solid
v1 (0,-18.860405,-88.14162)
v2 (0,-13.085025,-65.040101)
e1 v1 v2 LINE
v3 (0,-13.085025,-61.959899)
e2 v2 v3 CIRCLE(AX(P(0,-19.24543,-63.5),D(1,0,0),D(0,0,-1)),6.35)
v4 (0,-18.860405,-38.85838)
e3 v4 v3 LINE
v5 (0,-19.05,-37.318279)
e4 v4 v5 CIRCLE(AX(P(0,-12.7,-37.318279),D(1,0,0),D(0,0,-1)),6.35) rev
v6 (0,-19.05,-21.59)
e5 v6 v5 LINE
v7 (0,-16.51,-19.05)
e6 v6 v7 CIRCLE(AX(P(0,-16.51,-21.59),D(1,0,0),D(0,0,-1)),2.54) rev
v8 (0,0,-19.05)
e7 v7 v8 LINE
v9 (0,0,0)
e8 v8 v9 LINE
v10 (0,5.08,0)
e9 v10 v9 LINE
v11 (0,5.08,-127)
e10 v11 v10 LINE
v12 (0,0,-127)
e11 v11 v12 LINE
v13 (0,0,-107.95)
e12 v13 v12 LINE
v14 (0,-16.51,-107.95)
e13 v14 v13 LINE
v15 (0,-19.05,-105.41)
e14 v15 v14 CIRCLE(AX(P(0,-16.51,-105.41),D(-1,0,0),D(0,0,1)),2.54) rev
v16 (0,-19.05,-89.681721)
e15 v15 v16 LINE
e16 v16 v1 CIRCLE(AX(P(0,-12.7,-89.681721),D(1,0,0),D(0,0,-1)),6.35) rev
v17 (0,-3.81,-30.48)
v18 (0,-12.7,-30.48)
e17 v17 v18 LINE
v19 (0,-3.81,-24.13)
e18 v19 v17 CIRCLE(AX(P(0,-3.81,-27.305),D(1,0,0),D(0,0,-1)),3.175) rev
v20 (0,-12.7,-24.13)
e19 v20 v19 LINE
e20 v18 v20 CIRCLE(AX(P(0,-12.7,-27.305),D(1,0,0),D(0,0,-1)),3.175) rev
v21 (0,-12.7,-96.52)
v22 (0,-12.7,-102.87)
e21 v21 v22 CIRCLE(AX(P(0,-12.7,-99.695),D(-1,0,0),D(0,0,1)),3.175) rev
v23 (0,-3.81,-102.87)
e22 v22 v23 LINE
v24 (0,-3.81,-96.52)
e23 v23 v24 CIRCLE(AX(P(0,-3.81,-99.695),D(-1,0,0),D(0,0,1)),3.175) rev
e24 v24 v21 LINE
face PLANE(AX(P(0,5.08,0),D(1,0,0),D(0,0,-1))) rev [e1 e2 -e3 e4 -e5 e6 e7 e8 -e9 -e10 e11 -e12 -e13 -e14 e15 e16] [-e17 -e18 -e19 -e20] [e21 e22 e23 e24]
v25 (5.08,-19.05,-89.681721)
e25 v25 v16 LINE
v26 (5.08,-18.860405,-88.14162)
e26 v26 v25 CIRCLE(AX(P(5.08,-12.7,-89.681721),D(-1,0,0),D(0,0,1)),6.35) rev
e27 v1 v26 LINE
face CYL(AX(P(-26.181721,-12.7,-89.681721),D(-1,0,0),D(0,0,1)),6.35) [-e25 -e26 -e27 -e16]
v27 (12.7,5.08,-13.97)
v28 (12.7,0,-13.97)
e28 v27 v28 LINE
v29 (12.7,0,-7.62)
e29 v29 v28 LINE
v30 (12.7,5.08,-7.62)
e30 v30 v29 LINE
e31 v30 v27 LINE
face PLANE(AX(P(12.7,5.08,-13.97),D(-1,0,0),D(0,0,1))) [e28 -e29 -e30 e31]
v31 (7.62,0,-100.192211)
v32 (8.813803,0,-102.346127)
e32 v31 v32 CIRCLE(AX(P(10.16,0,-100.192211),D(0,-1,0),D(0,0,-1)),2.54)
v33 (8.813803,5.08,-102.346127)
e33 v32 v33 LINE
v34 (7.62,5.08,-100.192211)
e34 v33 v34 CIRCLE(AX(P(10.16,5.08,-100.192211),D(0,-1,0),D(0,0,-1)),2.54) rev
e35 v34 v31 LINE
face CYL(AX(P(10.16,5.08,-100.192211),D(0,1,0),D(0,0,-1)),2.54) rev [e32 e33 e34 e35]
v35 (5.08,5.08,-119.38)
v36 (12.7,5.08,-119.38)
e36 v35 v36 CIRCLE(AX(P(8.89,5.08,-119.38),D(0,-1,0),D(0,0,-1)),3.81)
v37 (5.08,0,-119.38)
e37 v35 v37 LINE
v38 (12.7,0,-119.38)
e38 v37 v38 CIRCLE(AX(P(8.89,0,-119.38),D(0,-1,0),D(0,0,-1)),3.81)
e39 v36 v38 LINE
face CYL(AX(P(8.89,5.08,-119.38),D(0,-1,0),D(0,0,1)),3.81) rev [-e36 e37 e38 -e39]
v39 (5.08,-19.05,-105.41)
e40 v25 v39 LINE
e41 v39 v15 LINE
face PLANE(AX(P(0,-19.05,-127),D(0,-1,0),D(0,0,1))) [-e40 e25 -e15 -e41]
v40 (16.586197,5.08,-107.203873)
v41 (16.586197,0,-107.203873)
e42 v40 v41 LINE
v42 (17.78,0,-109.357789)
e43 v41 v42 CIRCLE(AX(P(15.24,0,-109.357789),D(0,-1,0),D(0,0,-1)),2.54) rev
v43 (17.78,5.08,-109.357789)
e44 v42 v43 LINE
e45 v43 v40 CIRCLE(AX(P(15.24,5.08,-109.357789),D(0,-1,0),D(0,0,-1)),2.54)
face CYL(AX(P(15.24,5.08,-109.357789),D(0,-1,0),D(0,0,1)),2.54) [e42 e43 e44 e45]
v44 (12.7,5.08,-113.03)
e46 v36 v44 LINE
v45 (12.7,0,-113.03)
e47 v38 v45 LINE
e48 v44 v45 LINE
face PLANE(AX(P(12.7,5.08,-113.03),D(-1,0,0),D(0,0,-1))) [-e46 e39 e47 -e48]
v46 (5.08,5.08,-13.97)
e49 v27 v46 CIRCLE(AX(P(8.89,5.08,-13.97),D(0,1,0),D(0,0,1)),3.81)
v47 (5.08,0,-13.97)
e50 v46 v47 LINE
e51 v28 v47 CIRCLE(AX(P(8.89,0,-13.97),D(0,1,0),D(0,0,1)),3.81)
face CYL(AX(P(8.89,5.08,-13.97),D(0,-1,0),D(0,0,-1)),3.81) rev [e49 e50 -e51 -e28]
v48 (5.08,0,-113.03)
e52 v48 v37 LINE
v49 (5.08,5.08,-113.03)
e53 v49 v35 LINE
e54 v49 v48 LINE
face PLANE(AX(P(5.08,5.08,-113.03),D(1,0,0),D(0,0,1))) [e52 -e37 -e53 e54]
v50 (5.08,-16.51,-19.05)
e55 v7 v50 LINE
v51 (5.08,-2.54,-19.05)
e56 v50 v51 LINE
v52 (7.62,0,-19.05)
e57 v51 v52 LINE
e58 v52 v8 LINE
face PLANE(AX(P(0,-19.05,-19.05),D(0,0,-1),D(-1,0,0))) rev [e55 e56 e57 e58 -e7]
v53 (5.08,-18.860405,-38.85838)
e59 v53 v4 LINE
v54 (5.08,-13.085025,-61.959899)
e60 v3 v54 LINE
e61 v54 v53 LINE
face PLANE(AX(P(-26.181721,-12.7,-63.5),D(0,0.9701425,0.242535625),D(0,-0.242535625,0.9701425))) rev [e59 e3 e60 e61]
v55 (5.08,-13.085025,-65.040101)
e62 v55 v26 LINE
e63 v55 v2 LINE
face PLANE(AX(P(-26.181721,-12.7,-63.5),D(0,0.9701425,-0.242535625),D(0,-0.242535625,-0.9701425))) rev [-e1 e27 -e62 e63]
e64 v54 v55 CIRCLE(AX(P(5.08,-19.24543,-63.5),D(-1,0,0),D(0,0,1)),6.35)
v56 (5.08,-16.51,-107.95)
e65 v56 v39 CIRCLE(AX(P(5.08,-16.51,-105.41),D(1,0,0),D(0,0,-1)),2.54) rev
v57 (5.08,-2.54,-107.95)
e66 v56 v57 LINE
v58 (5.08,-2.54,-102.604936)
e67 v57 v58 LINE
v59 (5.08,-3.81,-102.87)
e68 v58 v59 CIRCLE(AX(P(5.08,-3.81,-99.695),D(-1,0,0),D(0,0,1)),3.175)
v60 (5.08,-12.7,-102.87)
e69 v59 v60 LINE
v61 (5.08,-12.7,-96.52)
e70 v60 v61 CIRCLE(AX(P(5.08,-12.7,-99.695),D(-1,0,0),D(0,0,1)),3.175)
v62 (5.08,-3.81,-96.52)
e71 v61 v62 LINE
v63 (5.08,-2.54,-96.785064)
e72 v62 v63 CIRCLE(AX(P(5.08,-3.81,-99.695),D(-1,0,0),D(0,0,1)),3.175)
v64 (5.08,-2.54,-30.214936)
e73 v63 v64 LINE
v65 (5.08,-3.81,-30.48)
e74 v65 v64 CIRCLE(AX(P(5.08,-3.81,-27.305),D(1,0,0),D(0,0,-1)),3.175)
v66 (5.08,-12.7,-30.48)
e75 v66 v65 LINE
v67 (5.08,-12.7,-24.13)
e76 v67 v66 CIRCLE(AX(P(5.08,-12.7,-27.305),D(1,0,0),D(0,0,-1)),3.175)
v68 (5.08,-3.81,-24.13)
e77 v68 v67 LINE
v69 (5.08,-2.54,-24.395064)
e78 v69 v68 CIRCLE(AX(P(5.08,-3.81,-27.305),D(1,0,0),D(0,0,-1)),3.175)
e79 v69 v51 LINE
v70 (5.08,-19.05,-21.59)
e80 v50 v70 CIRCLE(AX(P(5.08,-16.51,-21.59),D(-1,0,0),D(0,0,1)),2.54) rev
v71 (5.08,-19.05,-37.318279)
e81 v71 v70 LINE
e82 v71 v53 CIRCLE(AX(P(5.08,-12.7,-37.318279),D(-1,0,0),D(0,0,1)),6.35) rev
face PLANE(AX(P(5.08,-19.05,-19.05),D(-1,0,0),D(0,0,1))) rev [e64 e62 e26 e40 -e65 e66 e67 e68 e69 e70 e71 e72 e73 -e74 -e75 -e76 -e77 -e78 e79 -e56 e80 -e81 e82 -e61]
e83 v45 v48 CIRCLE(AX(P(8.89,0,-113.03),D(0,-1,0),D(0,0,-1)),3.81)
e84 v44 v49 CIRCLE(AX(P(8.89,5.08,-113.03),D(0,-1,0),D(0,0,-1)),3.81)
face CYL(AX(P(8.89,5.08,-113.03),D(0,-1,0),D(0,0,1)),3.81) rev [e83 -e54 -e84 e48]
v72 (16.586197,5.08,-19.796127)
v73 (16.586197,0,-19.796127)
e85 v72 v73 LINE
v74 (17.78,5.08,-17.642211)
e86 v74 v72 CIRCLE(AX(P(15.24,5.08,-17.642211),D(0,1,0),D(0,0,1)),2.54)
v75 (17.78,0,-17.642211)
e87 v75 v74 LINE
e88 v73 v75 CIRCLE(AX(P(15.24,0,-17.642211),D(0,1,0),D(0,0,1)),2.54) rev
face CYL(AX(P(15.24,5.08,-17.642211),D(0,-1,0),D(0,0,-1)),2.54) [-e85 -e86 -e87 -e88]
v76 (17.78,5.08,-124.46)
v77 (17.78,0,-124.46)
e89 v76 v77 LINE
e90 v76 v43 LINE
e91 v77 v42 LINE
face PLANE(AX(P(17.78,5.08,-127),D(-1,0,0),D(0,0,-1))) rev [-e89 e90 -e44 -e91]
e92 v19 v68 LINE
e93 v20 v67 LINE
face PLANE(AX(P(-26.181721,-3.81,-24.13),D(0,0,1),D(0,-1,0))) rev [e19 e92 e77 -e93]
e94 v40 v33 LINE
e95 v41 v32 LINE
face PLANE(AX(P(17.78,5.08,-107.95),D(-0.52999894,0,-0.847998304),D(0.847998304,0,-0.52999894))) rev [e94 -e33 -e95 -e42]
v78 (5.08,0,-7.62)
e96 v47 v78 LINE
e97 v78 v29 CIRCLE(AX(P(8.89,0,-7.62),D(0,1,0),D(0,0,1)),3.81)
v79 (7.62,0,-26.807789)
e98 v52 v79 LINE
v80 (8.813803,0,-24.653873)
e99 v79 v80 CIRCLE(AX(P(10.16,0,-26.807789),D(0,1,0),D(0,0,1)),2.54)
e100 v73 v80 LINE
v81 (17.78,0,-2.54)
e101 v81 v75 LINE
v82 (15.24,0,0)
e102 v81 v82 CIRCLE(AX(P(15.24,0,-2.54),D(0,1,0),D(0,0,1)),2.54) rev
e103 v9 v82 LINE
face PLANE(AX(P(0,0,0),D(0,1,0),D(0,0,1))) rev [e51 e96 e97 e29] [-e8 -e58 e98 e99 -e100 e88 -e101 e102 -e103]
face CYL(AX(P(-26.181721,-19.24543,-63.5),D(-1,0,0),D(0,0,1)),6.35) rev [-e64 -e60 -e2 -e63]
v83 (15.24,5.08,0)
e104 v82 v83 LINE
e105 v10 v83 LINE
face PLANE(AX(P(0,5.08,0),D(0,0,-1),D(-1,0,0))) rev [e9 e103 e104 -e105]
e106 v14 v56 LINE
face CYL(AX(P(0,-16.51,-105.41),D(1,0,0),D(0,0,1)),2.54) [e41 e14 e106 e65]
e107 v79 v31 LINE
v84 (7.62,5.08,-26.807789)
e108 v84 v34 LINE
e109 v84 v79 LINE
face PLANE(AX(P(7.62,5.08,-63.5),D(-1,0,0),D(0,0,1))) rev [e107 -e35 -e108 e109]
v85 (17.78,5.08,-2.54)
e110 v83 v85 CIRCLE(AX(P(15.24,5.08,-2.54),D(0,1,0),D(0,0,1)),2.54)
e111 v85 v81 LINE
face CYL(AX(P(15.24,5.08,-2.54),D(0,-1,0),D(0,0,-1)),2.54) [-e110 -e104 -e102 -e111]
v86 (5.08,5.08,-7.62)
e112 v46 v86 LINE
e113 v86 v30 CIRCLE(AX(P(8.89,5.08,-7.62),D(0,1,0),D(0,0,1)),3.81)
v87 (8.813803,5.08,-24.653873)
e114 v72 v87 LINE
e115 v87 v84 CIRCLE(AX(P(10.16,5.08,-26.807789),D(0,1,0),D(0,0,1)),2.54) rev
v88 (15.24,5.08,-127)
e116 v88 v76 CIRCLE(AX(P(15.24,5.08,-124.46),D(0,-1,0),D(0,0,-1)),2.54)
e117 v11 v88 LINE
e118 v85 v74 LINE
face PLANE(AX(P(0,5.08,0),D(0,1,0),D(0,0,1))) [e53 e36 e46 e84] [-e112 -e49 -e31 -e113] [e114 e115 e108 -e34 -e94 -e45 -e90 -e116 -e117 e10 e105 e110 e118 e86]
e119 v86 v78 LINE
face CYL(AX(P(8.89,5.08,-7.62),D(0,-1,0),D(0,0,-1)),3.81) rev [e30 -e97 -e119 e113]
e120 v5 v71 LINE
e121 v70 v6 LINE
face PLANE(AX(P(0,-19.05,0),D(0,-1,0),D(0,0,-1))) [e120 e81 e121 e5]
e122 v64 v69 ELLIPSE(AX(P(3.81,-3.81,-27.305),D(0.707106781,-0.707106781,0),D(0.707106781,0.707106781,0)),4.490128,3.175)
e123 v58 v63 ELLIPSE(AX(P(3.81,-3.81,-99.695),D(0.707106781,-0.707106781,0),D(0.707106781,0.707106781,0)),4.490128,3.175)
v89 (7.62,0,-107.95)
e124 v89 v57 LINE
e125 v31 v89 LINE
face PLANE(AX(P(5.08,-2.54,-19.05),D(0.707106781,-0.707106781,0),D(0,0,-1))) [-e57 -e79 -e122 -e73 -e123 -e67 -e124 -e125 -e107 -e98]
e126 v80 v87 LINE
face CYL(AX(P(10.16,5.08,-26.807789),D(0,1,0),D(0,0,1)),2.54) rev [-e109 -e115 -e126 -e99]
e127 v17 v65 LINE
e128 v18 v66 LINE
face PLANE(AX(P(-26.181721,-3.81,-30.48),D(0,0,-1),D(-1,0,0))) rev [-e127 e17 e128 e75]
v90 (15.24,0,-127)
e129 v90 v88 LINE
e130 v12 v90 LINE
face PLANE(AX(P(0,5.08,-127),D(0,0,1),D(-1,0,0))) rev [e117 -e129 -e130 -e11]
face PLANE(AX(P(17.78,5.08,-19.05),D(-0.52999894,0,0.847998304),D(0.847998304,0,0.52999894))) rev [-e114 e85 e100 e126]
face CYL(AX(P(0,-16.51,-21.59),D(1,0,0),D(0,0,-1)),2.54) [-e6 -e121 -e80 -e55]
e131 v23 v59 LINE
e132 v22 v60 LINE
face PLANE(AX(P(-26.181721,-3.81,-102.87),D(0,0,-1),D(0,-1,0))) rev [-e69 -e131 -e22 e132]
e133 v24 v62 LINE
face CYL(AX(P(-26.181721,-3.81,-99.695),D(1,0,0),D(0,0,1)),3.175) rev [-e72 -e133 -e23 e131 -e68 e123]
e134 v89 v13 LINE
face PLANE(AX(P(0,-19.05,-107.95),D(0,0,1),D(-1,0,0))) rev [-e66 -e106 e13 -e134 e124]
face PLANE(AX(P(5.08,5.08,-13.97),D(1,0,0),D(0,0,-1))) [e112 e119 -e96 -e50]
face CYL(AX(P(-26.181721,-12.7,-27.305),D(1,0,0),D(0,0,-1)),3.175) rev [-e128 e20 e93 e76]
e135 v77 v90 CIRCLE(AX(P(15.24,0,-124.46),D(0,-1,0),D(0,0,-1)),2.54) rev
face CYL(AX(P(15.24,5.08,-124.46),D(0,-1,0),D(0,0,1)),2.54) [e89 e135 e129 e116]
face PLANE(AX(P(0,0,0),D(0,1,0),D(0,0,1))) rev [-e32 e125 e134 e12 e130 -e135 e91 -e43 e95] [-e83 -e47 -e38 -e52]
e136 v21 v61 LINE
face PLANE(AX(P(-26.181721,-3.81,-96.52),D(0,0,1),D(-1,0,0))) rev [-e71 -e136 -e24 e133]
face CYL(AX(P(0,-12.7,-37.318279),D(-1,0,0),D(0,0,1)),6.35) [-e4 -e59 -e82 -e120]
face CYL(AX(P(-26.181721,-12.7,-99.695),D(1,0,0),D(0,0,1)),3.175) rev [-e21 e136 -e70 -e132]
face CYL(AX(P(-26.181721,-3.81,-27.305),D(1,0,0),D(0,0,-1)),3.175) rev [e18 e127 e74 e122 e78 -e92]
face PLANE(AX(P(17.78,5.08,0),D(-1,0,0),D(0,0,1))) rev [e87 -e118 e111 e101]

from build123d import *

# Parameters (mm, degrees)
TOP_DEPTH             = 5.08
SKETCH2_W             = 5.08
SKETCH2_H             = 44.45
BOLT_ATTACH_DEPTH     = 19.05
BOLTHOLES_LOWER_DEPTH = 5.08
MIRROREDFILLET_R      = 2.54
CENTERFILLET_R        = 6.35
CHAMFER1_SIZE         = 2.54


with BuildPart() as part:
    # Sketch1 → top (new body)
    with BuildSketch(Plane(origin=(0, 0, 0), x_dir=(1, 0, 0), z_dir=(0, 1, 0))):
        Polygon((0, 0), (0, 63.5), (7.62, 63.5), (7.62, 25.4), (17.78, 19.05), (17.78, 0), align=None)
        with BuildLine():
            Line((12.7, 13.97), (12.7, 7.62))
            ThreePointArc((12.7, 7.62), (8.89, 3.81), (5.08, 7.62))
            Line((5.08, 7.62), (5.08, 13.97))
            ThreePointArc((5.08, 13.97), (8.89, 17.78), (12.7, 13.97))
        make_face(mode=Mode.SUBTRACT)
    extrude(amount=TOP_DEPTH)

    # Sketch2 → bolt_attach (add)
    with BuildSketch(Plane.XZ):
        with Locations((2.54, -41.275)):
            Rectangle(SKETCH2_W, SKETCH2_H)
    extrude(amount=BOLT_ATTACH_DEPTH)

    # Sketch3 → boltholes_lower (cut)
    with BuildSketch(Plane(origin=(5.08, 0, 0), x_dir=(0, 0, -1), z_dir=(1, 0, 0))):
        with BuildLine():
            Line((30.48, -3.81), (30.48, -12.7))
            ThreePointArc((30.48, -12.7), (27.305, -15.875), (24.13, -12.7))
            Line((24.13, -12.7), (24.13, -3.81))
            ThreePointArc((24.13, -3.81), (27.305, -0.635), (30.48, -3.81))
        make_face()
        Polygon((63.5, -19.05), (63.5, -12.7), (38.1, -19.05), align=None)
    extrude(amount=-BOLTHOLES_LOWER_DEPTH, mode=Mode.SUBTRACT)

    # mirroredfillet
    mirroredfillet_edges = [part.edges().sort_by_distance(p)[0] for p in [
        (7.62, 2.54, -25.4),
        (17.78, 2.54, -19.05),
        (17.78, 2.54, 0),
        (2.54, -19.05, -19.05),
    ]]
    fillet(mirroredfillet_edges, radius=MIRROREDFILLET_R)

    # Mirror2: part across face


with BuildPart() as part_1:
    add(part.part)
    add(part.part.mirror(Plane(origin=(3.01625, -3.01625, -63.5), x_dir=(1, 0, 0), z_dir=(0, 0, -1))))

    # centerfillet
    centerfillet_edges = [part_1.edges().sort_by_distance(p)[0] for p in [
        (2.54, -12.7, -63.5),
        (2.54, -19.05, -88.9),
        (2.54, -19.05, -38.1),
    ]]
    fillet(centerfillet_edges, radius=CENTERFILLET_R)

    # Chamfer1
    # the kernel refuses this chamfer: 2.54 mm, written as the material it adds along each edge
    with BuildSketch(Plane(origin=(5.08, 0, -19.05), x_dir=(0.9996219169112968, 0.02749587661058638, 0), z_dir=(0, 0, -1))) as chamfer1_piece_1_section:
        Polygon((CHAMFER1_SIZE * 0.999621916911, CHAMFER1_SIZE * 0.0274958766106), (-CHAMFER1_SIZE * 0.0274958766106, CHAMFER1_SIZE * 0.999621916911), (0, 0), align=None)
    chamfer1_piece_1 = extrude(amount=88.9, mode=Mode.PRIVATE)
    chamfer1_piece_1 = chamfer1_piece_1 - Plane(origin=(5.940102797, -3.81, -27.305), x_dir=(0, 0, 1), z_dir=(1, 0, 0)) * Cylinder(3.175, 188, mode=Mode.PRIVATE)
    chamfer1_piece_1 = chamfer1_piece_1 - Plane(origin=(5.940102797, -3.81, -99.695), x_dir=(0, 0, -1), z_dir=(1, 0, 0)) * Cylinder(3.175, 188, mode=Mode.PRIVATE)
    add(chamfer1_piece_1)


solid = part_1.part
